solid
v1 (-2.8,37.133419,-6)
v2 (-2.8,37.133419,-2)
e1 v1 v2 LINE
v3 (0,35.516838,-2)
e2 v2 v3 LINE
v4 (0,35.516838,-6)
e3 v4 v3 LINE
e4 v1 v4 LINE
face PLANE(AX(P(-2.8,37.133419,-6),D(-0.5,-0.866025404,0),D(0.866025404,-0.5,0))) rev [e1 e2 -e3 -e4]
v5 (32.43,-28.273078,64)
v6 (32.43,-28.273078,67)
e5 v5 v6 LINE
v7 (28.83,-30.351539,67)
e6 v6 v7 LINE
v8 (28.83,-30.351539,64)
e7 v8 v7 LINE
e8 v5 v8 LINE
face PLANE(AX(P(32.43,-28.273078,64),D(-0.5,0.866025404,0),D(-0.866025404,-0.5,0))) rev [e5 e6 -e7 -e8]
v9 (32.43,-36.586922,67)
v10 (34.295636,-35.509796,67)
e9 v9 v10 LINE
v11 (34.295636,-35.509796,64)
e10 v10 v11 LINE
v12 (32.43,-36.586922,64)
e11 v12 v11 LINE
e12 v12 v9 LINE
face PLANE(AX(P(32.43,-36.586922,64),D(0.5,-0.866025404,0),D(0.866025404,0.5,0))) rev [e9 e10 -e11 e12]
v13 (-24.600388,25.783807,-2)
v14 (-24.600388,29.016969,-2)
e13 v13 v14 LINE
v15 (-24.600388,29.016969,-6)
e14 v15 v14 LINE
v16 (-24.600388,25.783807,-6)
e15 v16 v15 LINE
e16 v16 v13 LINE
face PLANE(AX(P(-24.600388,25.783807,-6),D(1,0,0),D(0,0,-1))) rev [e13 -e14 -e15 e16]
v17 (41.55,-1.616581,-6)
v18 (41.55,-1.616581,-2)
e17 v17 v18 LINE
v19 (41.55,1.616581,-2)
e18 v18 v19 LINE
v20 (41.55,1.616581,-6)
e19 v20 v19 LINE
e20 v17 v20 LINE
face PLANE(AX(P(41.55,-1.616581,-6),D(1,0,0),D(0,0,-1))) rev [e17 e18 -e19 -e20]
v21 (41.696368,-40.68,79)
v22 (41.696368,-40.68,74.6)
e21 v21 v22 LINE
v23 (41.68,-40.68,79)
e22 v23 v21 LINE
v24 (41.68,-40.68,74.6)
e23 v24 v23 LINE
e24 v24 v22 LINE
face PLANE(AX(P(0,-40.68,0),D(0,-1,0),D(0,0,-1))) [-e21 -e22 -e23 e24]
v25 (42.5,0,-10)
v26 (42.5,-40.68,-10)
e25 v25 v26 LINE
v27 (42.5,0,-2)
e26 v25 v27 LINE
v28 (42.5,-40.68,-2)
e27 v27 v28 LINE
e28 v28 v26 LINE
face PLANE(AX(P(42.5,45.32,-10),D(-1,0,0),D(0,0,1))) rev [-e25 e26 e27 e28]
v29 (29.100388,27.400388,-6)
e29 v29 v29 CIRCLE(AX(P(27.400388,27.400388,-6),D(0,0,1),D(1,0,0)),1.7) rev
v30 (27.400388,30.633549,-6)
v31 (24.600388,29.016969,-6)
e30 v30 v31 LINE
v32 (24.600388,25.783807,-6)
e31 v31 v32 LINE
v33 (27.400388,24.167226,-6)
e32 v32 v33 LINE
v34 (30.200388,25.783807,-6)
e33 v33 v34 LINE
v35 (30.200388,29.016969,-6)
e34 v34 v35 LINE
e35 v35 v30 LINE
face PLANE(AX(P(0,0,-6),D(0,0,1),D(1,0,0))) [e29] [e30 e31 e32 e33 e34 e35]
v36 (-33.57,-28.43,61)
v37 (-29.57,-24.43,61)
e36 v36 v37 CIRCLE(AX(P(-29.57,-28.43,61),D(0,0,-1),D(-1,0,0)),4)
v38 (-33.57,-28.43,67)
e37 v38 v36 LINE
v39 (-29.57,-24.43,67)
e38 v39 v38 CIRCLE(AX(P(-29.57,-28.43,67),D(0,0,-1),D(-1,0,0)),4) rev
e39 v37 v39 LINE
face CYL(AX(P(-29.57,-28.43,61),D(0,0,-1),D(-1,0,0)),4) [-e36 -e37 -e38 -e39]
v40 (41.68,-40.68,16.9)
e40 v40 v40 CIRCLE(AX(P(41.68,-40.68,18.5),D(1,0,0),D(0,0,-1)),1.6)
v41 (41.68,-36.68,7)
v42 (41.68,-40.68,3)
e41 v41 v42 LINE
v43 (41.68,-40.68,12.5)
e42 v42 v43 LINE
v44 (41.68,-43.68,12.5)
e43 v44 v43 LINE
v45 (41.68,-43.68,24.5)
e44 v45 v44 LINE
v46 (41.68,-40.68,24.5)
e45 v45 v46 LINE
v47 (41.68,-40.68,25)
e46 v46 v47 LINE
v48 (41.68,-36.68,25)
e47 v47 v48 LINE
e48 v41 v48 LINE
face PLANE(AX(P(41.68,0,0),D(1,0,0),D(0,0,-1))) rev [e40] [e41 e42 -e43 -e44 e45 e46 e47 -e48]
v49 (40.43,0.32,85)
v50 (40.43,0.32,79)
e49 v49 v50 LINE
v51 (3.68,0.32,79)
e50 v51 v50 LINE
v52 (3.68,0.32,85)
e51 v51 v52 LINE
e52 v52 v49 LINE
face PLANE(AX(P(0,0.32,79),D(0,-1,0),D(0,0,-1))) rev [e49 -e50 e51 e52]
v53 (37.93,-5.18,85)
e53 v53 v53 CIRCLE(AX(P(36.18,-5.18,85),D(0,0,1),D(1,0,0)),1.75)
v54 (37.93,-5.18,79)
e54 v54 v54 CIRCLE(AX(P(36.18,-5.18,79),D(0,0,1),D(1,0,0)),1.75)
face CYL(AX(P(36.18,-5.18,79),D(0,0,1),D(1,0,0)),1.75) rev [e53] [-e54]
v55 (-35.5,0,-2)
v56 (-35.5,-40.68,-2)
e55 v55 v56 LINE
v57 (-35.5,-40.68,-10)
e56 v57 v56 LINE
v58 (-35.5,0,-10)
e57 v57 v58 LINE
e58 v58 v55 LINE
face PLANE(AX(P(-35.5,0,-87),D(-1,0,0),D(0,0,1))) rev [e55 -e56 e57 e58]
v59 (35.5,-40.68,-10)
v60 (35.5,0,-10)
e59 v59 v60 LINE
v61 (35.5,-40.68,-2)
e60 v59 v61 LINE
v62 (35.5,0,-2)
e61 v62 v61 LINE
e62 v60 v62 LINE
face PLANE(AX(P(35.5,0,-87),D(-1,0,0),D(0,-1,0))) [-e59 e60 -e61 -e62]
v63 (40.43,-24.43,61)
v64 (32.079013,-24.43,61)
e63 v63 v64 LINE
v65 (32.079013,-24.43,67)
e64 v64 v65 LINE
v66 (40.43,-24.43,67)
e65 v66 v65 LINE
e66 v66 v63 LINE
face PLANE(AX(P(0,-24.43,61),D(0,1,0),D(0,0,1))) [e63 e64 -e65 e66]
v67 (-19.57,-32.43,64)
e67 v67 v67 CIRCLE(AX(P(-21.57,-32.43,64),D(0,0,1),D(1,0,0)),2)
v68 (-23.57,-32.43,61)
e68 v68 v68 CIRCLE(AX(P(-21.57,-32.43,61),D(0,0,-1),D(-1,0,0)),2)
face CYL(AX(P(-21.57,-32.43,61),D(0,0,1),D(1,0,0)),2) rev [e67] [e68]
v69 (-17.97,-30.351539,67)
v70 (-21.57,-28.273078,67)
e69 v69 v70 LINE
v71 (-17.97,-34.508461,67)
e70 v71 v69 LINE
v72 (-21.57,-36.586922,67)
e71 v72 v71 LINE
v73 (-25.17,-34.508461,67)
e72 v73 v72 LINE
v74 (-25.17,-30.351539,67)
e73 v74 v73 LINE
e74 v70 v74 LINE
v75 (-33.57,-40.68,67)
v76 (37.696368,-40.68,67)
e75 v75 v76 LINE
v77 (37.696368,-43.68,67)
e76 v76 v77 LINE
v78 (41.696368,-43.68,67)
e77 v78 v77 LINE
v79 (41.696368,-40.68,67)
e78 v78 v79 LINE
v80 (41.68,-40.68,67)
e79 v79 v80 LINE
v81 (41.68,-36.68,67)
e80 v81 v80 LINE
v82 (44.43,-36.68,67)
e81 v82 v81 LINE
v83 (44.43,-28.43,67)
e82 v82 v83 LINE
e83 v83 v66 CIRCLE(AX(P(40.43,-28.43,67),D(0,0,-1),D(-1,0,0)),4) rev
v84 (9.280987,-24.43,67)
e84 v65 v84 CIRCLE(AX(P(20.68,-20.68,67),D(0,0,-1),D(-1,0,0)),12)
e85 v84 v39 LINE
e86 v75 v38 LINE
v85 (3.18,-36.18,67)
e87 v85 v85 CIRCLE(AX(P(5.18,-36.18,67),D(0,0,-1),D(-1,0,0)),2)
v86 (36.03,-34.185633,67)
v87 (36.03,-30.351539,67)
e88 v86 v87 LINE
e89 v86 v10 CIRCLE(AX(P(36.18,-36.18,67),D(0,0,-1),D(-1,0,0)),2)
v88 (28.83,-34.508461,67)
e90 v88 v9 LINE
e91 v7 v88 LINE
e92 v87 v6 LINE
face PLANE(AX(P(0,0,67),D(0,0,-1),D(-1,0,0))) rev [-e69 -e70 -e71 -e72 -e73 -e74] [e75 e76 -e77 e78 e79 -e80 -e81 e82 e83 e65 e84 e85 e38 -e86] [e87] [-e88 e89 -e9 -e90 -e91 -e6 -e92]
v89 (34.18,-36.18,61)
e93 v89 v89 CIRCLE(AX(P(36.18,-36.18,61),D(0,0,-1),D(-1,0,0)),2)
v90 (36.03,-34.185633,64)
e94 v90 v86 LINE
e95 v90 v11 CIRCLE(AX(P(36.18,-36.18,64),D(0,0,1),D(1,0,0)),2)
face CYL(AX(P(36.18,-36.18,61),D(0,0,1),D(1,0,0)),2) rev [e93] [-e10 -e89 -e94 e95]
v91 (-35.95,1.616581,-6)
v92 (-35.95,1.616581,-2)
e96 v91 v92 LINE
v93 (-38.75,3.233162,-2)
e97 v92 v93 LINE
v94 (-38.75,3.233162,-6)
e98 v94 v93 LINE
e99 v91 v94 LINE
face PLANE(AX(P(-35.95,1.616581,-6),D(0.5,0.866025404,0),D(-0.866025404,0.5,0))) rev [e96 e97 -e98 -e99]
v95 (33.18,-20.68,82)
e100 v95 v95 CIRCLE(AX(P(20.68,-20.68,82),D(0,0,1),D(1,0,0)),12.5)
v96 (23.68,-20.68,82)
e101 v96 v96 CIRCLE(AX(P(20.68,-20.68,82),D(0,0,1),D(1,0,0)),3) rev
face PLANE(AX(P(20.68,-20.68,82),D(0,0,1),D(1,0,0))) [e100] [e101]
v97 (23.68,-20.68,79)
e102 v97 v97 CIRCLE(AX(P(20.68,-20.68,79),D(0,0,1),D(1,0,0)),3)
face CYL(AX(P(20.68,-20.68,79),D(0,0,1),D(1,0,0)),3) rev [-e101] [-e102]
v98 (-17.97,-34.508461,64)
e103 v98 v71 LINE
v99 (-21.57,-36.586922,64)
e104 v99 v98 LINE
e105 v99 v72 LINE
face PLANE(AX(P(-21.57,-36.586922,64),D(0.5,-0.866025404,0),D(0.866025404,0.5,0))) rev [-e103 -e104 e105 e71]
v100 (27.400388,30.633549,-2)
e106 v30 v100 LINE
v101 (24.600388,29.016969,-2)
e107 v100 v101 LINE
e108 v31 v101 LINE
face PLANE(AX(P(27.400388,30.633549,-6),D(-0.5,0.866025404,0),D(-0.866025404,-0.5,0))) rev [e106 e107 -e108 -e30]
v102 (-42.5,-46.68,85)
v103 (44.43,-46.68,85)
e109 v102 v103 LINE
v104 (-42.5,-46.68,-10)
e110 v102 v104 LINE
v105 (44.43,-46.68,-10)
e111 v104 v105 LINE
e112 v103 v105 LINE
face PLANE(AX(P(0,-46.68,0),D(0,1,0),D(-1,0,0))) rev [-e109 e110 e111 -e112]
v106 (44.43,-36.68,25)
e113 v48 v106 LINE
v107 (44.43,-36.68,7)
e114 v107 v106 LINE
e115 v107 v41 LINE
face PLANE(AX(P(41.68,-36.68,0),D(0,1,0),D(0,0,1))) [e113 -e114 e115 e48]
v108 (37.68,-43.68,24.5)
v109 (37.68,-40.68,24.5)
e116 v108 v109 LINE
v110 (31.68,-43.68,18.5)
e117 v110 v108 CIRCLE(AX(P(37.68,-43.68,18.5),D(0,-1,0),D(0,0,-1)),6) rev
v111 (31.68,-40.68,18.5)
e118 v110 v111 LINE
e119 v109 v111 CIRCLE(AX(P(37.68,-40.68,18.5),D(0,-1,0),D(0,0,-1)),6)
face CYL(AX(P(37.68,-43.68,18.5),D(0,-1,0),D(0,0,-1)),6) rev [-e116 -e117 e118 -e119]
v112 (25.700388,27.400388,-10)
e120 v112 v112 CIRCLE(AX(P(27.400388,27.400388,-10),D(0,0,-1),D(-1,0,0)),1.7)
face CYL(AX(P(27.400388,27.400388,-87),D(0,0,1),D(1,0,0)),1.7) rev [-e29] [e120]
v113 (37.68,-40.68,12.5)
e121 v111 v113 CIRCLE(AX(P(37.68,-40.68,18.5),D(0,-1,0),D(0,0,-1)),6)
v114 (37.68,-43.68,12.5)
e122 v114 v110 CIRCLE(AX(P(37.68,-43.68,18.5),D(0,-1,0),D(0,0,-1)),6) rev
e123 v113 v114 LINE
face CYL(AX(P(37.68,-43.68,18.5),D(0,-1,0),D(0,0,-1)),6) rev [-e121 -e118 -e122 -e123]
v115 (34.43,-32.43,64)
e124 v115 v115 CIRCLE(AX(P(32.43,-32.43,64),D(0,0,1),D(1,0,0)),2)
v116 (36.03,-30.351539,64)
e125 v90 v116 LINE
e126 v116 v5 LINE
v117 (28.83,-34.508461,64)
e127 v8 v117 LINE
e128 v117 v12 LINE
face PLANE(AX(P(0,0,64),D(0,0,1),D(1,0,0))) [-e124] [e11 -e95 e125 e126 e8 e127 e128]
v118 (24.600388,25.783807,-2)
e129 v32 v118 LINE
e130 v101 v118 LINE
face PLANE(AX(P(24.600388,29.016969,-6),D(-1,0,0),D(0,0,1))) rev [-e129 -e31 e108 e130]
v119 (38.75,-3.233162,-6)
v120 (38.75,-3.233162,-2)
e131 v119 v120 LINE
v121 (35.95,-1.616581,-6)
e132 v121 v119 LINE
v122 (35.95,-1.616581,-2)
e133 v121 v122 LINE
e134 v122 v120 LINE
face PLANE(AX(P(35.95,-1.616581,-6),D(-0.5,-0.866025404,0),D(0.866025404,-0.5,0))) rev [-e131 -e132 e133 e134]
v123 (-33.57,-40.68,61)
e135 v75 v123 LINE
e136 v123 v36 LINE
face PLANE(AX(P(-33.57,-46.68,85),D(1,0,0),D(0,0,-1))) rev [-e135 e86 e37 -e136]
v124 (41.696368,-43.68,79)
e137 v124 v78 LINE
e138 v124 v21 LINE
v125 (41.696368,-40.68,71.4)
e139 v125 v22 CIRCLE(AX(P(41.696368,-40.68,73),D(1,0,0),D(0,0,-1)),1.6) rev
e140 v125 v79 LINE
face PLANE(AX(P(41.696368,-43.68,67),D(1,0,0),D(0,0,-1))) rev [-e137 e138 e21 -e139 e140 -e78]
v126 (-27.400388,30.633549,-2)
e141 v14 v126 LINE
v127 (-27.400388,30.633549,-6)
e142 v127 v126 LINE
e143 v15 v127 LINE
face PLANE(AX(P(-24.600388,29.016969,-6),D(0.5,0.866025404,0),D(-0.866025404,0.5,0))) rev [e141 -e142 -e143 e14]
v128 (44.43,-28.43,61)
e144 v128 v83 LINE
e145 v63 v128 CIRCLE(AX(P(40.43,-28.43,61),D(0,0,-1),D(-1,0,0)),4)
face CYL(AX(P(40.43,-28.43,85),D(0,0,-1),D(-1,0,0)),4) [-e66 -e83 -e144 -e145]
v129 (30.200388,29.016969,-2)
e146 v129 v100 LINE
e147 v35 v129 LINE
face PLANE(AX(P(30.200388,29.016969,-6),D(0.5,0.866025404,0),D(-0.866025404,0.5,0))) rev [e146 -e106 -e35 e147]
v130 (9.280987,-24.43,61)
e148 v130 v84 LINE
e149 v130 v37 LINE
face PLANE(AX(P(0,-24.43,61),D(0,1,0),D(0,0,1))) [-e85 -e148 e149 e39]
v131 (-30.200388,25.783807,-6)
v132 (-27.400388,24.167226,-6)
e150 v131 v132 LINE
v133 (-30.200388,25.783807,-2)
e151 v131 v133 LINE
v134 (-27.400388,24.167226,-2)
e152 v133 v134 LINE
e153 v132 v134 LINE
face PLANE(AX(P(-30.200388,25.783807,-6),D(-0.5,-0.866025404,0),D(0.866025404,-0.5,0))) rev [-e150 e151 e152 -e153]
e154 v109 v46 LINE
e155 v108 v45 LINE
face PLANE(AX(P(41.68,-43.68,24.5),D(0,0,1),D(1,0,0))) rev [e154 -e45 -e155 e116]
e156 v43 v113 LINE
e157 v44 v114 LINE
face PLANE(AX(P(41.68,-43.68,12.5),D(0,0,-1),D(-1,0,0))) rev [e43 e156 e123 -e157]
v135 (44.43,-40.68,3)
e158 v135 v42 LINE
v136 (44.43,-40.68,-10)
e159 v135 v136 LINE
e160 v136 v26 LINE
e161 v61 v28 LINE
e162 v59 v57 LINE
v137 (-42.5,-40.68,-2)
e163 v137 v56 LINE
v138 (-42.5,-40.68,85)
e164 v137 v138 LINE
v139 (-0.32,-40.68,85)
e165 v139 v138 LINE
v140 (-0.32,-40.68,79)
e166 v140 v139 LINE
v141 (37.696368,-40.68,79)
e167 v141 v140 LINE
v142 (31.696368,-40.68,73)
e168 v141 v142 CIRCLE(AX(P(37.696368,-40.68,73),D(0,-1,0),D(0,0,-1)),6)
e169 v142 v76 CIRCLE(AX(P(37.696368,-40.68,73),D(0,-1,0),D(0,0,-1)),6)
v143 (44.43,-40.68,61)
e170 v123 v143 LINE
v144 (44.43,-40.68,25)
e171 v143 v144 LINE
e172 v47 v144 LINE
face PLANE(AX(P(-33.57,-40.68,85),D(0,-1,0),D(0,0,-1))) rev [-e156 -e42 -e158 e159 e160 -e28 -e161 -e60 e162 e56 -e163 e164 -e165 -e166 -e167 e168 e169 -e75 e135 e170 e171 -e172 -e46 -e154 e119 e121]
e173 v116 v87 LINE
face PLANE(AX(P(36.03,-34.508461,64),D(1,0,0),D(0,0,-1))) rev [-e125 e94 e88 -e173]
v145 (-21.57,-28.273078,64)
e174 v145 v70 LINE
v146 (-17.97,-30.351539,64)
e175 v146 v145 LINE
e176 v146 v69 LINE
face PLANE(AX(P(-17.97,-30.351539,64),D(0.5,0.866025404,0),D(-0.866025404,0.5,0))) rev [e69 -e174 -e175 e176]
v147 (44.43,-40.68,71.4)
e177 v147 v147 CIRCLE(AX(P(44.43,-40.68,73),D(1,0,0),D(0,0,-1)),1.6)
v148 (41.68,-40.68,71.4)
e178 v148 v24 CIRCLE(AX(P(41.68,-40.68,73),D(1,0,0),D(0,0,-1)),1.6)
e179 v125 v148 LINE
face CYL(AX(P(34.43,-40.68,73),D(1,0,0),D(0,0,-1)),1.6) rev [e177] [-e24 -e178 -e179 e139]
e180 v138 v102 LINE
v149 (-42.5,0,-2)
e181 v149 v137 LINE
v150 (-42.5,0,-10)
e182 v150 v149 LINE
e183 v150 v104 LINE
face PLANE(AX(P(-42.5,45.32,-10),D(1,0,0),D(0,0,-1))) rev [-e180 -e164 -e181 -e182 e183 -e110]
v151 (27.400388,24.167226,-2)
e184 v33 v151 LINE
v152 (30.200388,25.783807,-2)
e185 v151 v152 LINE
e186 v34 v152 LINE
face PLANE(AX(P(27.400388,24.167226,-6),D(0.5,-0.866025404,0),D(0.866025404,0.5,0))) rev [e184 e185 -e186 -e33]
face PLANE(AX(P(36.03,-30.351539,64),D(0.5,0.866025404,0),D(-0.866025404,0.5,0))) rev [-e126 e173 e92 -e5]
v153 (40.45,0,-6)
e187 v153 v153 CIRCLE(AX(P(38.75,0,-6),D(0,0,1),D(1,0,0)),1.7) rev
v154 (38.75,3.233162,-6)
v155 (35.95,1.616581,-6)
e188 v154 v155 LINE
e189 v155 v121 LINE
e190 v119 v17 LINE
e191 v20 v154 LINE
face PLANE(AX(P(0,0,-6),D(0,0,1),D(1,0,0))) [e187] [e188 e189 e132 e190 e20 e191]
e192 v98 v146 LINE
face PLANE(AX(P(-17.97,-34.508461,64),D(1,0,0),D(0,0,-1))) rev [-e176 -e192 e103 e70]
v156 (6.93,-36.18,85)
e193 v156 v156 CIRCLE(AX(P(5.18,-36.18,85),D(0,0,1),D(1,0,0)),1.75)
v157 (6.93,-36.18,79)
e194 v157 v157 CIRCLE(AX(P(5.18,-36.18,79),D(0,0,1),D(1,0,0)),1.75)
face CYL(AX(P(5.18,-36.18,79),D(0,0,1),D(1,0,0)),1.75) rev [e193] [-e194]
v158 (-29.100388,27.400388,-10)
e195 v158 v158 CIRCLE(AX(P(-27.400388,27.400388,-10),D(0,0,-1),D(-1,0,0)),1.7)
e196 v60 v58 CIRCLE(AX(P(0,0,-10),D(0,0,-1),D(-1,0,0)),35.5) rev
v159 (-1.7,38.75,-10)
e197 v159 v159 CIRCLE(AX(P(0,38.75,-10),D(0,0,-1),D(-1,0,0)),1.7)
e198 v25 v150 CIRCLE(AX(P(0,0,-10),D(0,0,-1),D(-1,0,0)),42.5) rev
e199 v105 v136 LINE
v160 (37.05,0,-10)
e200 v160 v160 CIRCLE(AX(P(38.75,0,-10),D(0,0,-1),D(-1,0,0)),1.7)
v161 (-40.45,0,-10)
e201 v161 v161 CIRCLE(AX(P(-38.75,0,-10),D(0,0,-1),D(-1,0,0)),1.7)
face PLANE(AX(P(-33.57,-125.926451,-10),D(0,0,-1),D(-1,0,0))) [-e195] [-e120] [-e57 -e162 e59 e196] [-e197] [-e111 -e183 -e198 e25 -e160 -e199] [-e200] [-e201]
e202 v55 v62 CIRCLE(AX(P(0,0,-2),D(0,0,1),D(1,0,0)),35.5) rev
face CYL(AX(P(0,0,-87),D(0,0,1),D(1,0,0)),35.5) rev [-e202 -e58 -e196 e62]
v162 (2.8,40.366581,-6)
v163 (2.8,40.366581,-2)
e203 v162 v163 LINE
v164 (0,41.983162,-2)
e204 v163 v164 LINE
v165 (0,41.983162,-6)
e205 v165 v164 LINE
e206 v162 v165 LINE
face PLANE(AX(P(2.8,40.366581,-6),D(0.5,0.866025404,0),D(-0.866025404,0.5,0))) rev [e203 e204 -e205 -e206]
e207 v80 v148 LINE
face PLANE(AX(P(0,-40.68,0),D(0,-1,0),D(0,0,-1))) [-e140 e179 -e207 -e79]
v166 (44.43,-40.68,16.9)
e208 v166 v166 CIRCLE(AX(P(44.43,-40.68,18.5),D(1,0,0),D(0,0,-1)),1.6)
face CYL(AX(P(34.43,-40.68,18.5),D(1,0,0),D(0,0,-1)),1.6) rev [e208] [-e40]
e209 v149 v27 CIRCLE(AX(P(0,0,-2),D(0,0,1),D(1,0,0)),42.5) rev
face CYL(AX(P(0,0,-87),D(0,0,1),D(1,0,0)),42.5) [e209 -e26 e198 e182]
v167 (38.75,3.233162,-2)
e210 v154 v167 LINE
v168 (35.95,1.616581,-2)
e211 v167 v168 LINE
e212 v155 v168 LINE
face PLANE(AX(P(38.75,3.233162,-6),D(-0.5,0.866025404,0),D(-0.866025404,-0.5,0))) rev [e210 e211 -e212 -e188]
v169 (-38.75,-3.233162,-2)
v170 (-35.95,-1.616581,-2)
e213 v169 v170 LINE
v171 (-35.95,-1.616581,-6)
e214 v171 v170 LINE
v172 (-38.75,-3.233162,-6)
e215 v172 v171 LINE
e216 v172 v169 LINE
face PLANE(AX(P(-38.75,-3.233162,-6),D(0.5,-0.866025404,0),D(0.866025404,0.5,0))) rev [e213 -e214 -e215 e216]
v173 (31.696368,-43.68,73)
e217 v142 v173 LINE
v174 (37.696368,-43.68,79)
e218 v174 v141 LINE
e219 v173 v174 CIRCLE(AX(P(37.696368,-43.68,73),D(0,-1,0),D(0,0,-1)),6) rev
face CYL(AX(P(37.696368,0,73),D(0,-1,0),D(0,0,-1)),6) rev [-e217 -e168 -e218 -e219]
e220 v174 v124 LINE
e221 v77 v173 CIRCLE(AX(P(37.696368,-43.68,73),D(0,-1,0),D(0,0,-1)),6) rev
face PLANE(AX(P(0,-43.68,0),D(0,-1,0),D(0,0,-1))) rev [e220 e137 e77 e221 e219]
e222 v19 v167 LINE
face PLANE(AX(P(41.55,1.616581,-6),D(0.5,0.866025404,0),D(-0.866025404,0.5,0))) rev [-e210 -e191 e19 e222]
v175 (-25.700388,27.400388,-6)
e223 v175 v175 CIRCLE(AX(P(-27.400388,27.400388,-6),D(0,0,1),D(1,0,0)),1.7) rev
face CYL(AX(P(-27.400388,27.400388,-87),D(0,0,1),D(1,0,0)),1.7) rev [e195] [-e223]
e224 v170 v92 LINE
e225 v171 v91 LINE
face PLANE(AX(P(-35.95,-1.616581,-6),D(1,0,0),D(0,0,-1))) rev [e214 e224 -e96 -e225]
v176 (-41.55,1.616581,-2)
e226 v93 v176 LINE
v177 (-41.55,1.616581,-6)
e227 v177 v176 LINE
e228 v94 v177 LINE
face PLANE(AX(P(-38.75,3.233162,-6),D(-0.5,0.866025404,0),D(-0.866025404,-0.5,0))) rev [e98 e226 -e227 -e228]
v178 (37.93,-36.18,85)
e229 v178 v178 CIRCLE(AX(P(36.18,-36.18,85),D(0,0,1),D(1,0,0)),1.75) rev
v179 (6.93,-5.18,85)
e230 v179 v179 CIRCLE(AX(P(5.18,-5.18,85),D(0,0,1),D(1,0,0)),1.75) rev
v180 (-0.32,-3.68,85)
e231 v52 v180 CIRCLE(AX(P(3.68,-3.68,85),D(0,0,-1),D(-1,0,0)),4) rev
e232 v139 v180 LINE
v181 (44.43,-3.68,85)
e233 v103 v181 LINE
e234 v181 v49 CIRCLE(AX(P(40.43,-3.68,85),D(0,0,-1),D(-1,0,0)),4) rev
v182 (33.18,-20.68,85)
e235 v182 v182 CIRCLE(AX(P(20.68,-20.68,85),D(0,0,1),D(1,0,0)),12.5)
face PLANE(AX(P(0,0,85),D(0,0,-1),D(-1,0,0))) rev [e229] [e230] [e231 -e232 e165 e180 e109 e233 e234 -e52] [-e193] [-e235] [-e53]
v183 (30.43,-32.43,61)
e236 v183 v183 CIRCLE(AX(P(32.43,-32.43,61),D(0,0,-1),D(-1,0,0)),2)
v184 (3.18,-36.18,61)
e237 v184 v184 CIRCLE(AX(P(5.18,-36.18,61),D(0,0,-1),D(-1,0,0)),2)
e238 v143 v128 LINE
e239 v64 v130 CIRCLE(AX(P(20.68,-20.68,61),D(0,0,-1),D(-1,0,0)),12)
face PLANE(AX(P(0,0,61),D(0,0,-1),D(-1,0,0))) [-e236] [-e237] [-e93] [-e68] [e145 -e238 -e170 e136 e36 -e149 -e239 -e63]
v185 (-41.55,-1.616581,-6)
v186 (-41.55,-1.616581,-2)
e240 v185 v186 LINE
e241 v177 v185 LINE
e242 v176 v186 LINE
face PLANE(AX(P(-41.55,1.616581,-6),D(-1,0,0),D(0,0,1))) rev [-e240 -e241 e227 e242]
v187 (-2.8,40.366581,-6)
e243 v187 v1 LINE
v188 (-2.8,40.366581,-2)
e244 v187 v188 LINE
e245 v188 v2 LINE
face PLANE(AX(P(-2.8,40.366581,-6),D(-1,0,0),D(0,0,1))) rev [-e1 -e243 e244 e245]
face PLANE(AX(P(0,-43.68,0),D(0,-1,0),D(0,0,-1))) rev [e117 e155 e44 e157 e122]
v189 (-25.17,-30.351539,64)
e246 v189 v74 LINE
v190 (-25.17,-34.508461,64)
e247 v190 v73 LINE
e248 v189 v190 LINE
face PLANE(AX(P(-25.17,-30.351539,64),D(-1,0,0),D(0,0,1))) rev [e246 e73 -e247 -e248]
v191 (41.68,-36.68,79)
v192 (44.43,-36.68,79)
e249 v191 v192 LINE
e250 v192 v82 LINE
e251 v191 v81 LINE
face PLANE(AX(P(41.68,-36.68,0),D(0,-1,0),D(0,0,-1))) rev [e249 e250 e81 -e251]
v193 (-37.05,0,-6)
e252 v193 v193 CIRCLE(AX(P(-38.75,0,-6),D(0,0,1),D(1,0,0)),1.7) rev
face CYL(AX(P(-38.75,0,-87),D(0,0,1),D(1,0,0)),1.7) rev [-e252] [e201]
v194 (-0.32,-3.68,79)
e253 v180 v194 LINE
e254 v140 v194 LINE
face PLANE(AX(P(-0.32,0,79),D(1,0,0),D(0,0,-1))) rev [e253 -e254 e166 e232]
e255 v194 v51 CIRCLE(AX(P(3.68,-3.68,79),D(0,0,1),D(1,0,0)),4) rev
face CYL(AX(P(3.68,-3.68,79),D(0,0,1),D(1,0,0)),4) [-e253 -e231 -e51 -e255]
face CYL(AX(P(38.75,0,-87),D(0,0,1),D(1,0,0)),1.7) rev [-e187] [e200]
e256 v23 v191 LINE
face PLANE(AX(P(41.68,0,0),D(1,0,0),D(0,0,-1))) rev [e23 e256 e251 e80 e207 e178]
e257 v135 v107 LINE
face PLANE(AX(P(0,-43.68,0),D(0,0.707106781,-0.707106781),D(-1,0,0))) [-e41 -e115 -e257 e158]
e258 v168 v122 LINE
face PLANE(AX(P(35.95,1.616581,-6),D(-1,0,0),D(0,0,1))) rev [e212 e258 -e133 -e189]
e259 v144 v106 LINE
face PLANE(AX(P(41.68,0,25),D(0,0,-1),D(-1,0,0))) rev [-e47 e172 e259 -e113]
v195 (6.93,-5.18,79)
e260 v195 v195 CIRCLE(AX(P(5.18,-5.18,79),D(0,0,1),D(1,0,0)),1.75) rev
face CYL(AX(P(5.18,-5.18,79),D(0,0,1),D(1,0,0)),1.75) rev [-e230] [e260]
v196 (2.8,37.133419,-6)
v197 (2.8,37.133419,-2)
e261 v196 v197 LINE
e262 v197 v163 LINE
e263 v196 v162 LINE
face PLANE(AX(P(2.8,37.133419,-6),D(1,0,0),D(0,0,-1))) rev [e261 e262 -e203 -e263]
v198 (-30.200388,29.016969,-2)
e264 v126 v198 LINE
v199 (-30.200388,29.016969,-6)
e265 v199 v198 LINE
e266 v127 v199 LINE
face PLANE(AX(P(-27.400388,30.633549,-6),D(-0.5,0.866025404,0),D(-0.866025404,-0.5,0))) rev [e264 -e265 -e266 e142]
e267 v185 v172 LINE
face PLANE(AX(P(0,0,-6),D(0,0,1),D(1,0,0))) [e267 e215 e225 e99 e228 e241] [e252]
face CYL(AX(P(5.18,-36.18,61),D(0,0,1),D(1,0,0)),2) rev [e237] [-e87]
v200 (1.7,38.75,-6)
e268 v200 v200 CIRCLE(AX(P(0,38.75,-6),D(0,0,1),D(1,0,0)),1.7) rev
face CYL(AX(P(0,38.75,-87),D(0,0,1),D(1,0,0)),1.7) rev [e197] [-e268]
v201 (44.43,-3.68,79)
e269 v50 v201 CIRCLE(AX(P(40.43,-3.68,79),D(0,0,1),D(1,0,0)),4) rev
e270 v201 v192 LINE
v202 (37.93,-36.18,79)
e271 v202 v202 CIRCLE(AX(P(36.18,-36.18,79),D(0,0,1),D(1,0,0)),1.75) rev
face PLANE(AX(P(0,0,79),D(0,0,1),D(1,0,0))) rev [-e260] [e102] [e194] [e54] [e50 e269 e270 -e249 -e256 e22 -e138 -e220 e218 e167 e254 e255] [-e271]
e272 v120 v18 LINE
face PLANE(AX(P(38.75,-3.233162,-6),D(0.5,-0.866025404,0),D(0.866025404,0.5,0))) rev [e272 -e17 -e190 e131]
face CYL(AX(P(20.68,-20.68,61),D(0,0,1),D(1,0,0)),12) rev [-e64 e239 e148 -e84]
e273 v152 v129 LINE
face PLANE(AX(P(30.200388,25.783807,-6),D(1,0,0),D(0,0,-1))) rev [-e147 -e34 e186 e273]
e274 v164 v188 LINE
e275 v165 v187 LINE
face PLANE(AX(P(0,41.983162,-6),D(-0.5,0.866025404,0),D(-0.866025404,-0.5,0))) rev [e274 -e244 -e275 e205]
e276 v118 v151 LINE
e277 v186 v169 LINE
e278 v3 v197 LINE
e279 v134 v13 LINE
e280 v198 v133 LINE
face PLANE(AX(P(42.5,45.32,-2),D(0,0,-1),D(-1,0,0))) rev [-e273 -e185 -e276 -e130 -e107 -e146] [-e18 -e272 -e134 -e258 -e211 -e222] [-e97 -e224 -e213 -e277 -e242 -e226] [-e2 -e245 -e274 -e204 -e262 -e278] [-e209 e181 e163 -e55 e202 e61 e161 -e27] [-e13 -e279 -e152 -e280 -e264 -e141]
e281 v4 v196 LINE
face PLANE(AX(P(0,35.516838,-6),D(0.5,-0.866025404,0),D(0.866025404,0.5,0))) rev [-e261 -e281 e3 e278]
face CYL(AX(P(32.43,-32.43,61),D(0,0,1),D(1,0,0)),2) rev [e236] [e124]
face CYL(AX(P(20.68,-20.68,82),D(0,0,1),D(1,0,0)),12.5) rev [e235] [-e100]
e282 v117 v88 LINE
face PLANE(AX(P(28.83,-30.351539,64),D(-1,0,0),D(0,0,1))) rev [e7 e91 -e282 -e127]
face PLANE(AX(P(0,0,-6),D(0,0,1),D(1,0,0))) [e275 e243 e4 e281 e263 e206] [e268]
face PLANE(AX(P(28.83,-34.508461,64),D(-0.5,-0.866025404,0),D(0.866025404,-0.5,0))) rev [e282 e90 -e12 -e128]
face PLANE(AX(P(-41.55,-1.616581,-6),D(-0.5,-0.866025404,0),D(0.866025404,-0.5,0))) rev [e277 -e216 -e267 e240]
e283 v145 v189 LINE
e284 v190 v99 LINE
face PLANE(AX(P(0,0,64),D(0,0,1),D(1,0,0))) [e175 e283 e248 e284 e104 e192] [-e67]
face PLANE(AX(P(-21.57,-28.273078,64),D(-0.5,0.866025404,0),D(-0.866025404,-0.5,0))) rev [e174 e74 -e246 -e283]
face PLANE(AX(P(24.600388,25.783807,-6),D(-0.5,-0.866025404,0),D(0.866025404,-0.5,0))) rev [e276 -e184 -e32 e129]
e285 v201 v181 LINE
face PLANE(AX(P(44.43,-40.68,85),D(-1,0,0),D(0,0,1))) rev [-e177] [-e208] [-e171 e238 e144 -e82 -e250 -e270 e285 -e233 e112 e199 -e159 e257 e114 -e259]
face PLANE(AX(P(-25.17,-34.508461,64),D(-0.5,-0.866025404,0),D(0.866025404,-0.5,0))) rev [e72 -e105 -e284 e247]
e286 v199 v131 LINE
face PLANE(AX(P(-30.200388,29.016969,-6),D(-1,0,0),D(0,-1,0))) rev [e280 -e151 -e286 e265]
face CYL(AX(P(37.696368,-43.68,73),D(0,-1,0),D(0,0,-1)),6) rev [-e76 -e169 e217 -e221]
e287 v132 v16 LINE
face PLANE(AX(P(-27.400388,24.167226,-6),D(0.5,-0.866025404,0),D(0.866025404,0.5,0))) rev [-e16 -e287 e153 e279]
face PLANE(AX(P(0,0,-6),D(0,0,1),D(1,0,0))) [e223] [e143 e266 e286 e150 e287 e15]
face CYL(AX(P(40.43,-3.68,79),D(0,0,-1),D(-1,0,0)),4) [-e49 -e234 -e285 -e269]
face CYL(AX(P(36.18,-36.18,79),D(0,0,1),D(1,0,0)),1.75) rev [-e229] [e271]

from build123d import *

# Parameters (mm, degrees)
SKETCH1_R            = 18.5
SKETCH1_R_2          = 3.5
SKETCH1_R_3          = 2.25
BOSS_EXTRUDE1_DEPTH  = 6
BOSS_EXTRUDE2_START  = -6
BOSS_EXTRUDE2_DEPTH  = 6
BOSS_EXTRUDE3_DEPTH  = 85
SKETCH6_R            = 2
BOSS_EXTRUDE5_DEPTH  = 6
SKETCH5_W            = 42
SKETCH5_H            = 41
SKETCH5_R            = 1.75
SKETCH5_R_2          = 3
BOSS_EXTRUDE4_DEPTH  = 6
SKETCH8_W            = 25
SKETCH8_H            = 7
BOSS_EXTRUDE7_DEPTH  = 2.75
CHAMFER2_SIZE        = 7
SKETCH9_R            = 1.6
CUT_EXTRUDE2_DEPTH   = 10
SKETCH10_W           = 10
SKETCH10_H           = 12
CUT_EXTRUDE3_DEPTH   = 3
FILLET1_R            = 6
SKETCH13_R           = 2.25
SKETCH13_R_2         = 3.5
CUT_EXTRUDE4_DEPTH   = 10
FILLET2_R            = 4
SKETCH15_W           = 78
SKETCH15_H           = 14
BOSS_EXTRUDE9_DEPTH  = 6
SKETCH17_W           = 85
SKETCH17_H           = 8
BOSS_EXTRUDE10_DEPTH = 86
SKETCH18_W           = 85
SKETCH18_H           = 1
SKETCH18_R           = 35.5
CUT_EXTRUDE8_DEPTH   = 85
BOSS_EXTRUDE11_DEPTH = 6
SKETCH21_R           = 1.7
CUT_EXTRUDE9_DEPTH   = 85
CUT_EXTRUDE10_DEPTH  = 4
CUT_EXTRUDE11_DEPTH  = 3
SKETCH24_R           = 12.5
CUT_EXTRUDE12_DEPTH  = 3


# Some blends are built 0.0001 mm under size
with BuildPart() as part:
    # Sketch1 → Boss-Extrude1 (new body)
    with BuildSketch(Plane.XY):
        Circle(SKETCH1_R)
        Circle(SKETCH1_R_2, mode=Mode.SUBTRACT)
        with Locations((-13.7, 0)):
            Circle(SKETCH1_R_3, mode=Mode.SUBTRACT)
        with Locations((13.7, 0)):
            Circle(SKETCH1_R_3, mode=Mode.SUBTRACT)
    extrude(amount=BOSS_EXTRUDE1_DEPTH)

    # Sketch3 → Boss-Extrude2 (add)
    with BuildSketch(Plane.XY.offset(6).offset(BOSS_EXTRUDE2_START)):
        with BuildLine():
            ThreePointArc((-15.5, -10.099504938), (-17.734147851, -5.267826876), (-18.5, 0))
            Line((-18.5, 0), (-18.5, -46.68))
            Line((-18.5, -46.68), (18.5, -46.68))
            Line((18.5, -46.68), (18.5, 0))
            ThreePointArc((18.5, 0), (17.734147851, -5.267826876), (15.5, -10.099504938))
            Line((15.5, -10.099504938), (15.5, -40.818554828))
            Line((15.5, -40.818554828), (15.5, -43.68))
            Line((15.5, -43.68), (13.738586173, -43.68))
            Line((13.738586173, -43.68), (-13.738586173, -43.68))
            Line((-13.738586173, -43.68), (-15.5, -43.68))
            Line((-15.5, -43.68), (-15.5, -40.818554828))
            Line((-15.5, -40.818554828), (-15.5, -10.099504938))
        make_face()
        with BuildLine():
            Line((-3, -20.512103215), (-15.5, -40.818554828))
            Line((-15.5, -40.818554828), (-15.5, -43.68))
            Line((-15.5, -43.68), (-13.738586173, -43.68))
            Line((-13.738586173, -43.68), (0, -21.361445172))
            Line((0, -21.361445172), (13.738586173, -43.68))
            Line((13.738586173, -43.68), (15.5, -43.68))
            Line((15.5, -43.68), (15.5, -40.818554828))
            Line((15.5, -40.818554828), (3, -20.512103215))
            Line((3, -20.512103215), (1.71251735, -18.420566884))
            ThreePointArc((1.71251735, -18.420566884), (0, -18.5), (-1.71251735, -18.420566884))
            Line((-1.71251735, -18.420566884), (-3, -20.512103215))
        make_face()
        with BuildLine():
            Line((3, -20.512103215), (3, -18.255136264))
            ThreePointArc((3, -18.255136264), (2.357710068, -18.349147207), (1.71251735, -18.420566884))
            Line((1.71251735, -18.420566884), (3, -20.512103215))
        make_face()
        with BuildLine():
            ThreePointArc((-1.71251735, -18.420566884), (-2.357710068, -18.349147207), (-3, -18.255136264))
            Line((-3, -18.255136264), (-3, -20.512103215))
            Line((-3, -20.512103215), (-1.71251735, -18.420566884))
        make_face()
    extrude(amount=BOSS_EXTRUDE2_DEPTH)

    # Sketch4 → Boss-Extrude3 (add)
    with BuildSketch(Plane.XY):
        Polygon((-33.57, -46.68), (-33.57, -40.68), (44.43, -40.68), (44.43, -46.68), (-18.5, -46.68), align=None)
    extrude(amount=BOSS_EXTRUDE3_DEPTH)

    # Sketch6 → Boss-Extrude5 (add)
    with BuildSketch(Plane(origin=(0, 0, 67), x_dir=(-1, 0, 0), z_dir=(0, 0, -1))):
        with BuildLine():
            Line((-44.43, -24.43), (-44.43, -43.68))
            Line((-44.43, -43.68), (33.57, -43.68))
            Line((33.57, -43.68), (33.57, -24.43))
            Line((33.57, -24.43), (-9.280986885, -24.43))
            ThreePointArc((-9.280986885, -24.43), (-20.68, -32.68), (-32.079013115, -24.43))
            Line((-32.079013115, -24.43), (-44.43, -24.43))
        make_face()
        with Locations((-36.18, -36.18)):
            Circle(SKETCH6_R, mode=Mode.SUBTRACT)
        with Locations((-32.43, -32.43)):
            Circle(SKETCH6_R, mode=Mode.SUBTRACT)
        with Locations((-5.18, -36.18)):
            Circle(SKETCH6_R, mode=Mode.SUBTRACT)
        with Locations((21.57, -32.43)):
            Circle(SKETCH6_R, mode=Mode.SUBTRACT)
    extrude(amount=BOSS_EXTRUDE5_DEPTH)

    # Sketch5 → Boss-Extrude4 (add)
    with BuildSketch(Plane.XY.offset(85)):
        with Locations((20.68, -20.18)):
            Rectangle(SKETCH5_W, SKETCH5_H)
        with Locations((5.18, -36.18)):
            Circle(SKETCH5_R, mode=Mode.SUBTRACT)
        with Locations((36.18, -36.18)):
            Circle(SKETCH5_R, mode=Mode.SUBTRACT)
        with Locations((5.18, -5.18)):
            Circle(SKETCH5_R, mode=Mode.SUBTRACT)
        with Locations((20.68, -20.68)):
            Circle(SKETCH5_R_2, mode=Mode.SUBTRACT)
        with Locations((36.18, -5.18)):
            Circle(SKETCH5_R, mode=Mode.SUBTRACT)
    extrude(amount=-BOSS_EXTRUDE4_DEPTH)

    # Sketch8 → Boss-Extrude7 (add)
    with BuildSketch(Plane(origin=(44.43, 0, 0), x_dir=(0, 0, -1), z_dir=(1, 0, 0))):
        with Locations((-12.5, -40.18)):
            Rectangle(SKETCH8_W, SKETCH8_H)
        Polygon((-61, -36.68), (-79, -36.68), (-79, 0.32), (-85, 0.32), (-85, -43.68), (-61, -43.68), align=None)
    extrude(amount=-BOSS_EXTRUDE7_DEPTH)

    # Chamfer2
    # the kernel refuses this chamfer: 7 mm, written as the material it takes off along each edge
    with BuildSketch(Plane(origin=(62.431780916, -36.68, 0), x_dir=(0, 0, 1), z_dir=(-1, 0, 0))) as chamfer2_piece_1:
        Polygon((CHAMFER2_SIZE, 0), (0, -CHAMFER2_SIZE), (0, 0), align=None)
    extrude(amount=38.753561832, mode=Mode.SUBTRACT)
    # the kernel refuses this chamfer: 7 mm, written as the material it takes off along each edge
    with BuildSketch(Plane(origin=(18.5, -40.68, 0), x_dir=(0, -1, 0), z_dir=(1, 0, 0))) as chamfer2_2_piece_1_section:
        Polygon((CHAMFER2_SIZE, 0), (0, -CHAMFER2_SIZE), (0, 0), align=None)
    chamfer2_2_piece_1 = extrude(amount=23.18, mode=Mode.PRIVATE)
    chamfer2_2_piece_1 = split(chamfer2_2_piece_1, bisect_by=Plane(origin=(18.5, -42.18, 1.5), z_dir=(0, 0.7071067811865476, -0.7071067811865476)), keep=Keep.TOP, mode=Mode.PRIVATE)
    add(chamfer2_2_piece_1, mode=Mode.SUBTRACT)

    # Sketch9 → Cut-Extrude2 (cut)
    with BuildSketch(Plane(origin=(44.43, 0, 0), x_dir=(0, 0, -1), z_dir=(1, 0, 0))):
        with Locations((-73, -40.68)):
            Circle(SKETCH9_R)
        with Locations((-18.5, -40.68)):
            Circle(SKETCH9_R)
    extrude(amount=-CUT_EXTRUDE2_DEPTH, mode=Mode.SUBTRACT)

    # Sketch10 → Cut-Extrude3 (cut)
    with BuildSketch(Plane(origin=(0, -40.68, 0), x_dir=(1, 0, 0), z_dir=(0, 1, 0))):
        with Locations((36.68, -18.5)):
            Rectangle(SKETCH10_W, SKETCH10_H)
        with Locations((36.696367594, -73)):
            Rectangle(SKETCH10_W, SKETCH10_H)
    extrude(amount=-CUT_EXTRUDE3_DEPTH, mode=Mode.SUBTRACT)

    # Fillet1
    fillet1_edges = [part.edges().sort_by_distance(p)[0] for p in [
        (31.696367594, -42.18, 67),
        (31.696367594, -42.18, 79),
        (31.68, -42.18, 24.5),
        (31.68, -42.18, 12.5),
    ]]
    fillet(fillet1_edges, radius=FILLET1_R - 0.0001)  # a hair under: the kernel refuses the full size

    # Sketch13 → Cut-Extrude4 (cut)
    # profile 1 of 4: a face of its own
    with BuildSketch(Plane(origin=(0, 0, 0), x_dir=(-1, 0, 0), z_dir=(0, 0, -1))):
        with BuildLine():
            ThreePointArc((3, -18.255136264), (0, -18.5), (-3, -18.255136264))
            Line((-3, -18.255136264), (-3, -20.512103215))
            Line((-3, -20.512103215), (-15.414710094, -40.68))
            Line((-15.414710094, -40.68), (-11.89188244, -40.68))
            Line((-11.89188244, -40.68), (0, -21.361445172))
            Line((0, -21.361445172), (11.89188244, -40.68))
            Line((11.89188244, -40.68), (15.414710094, -40.68))
            Line((15.414710094, -40.68), (3, -20.512103215))
            Line((3, -20.512103215), (3, -18.255136264))
        make_face()
    # profile 2 of 4: a face of its own
    with BuildSketch(Plane(origin=(0, 0, 0), x_dir=(-1, 0, 0), z_dir=(0, 0, -1))):
        with BuildLine():
            ThreePointArc((-15.5, -10.099504938), (-17.734147851, -5.267826876), (-18.5, 0))
            Line((-18.5, 0), (-18.5, -40.68))
            Line((-18.5, -40.68), (-15.5, -40.68))
            Line((-15.5, -40.68), (-15.5, -10.099504938))
        make_face()
    # profile 3 of 4: a face of its own
    with BuildSketch(Plane(origin=(0, 0, 0), x_dir=(-1, 0, 0), z_dir=(0, 0, -1))):
        with BuildLine():
            Line((18.5, -40.68), (18.5, 0))
            ThreePointArc((18.5, 0), (17.734147851, -5.267826876), (15.5, -10.099504938))
            Line((15.5, -10.099504938), (15.5, -40.68))
            Line((15.5, -40.68), (18.5, -40.68))
        make_face()
    # profile 4 of 4: a face of its own
    with BuildSketch(Plane(origin=(0, 0, 0), x_dir=(-1, 0, 0), z_dir=(0, 0, -1))):
        with BuildLine():
            ThreePointArc((18.5, 0), (0, 18.5), (-18.5, 0))
            ThreePointArc((-18.5, 0), (-17.734147851, -5.267826876), (-15.5, -10.099504938))
            ThreePointArc((-15.5, -10.099504938), (-10.10896041, -15.493834884), (-3, -18.255136264))
            ThreePointArc((-3, -18.255136264), (0, -18.5), (3, -18.255136264))
            ThreePointArc((3, -18.255136264), (10.10896041, -15.493834884), (15.5, -10.099504938))
            ThreePointArc((15.5, -10.099504938), (17.734147851, -5.267826876), (18.5, 0))
        make_face()
        with Locations((-13.7, 0)):
            Circle(SKETCH13_R, mode=Mode.SUBTRACT)
        Circle(SKETCH13_R_2, mode=Mode.SUBTRACT)
        with Locations((13.7, 0)):
            Circle(SKETCH13_R, mode=Mode.SUBTRACT)
    extrude(amount=-CUT_EXTRUDE4_DEPTH, mode=Mode.SUBTRACT)

    # Fillet2
    fillet2_edges = [part.edges().sort_by_distance(p)[0] for p in [
        (44.43, -24.43, 64),
        (-33.57, -24.43, 64),
        (-0.32, 0.32, 82),
        (44.43, 0.32, 82),
        (-33.57, -43.68, 0),
        (-33.57, -43.68, 85),
    ]]
    fillet(fillet2_edges, radius=FILLET2_R)

    # Sketch15 → Boss-Extrude9 (add)
    with BuildSketch(Plane(origin=(0, -40.68, 0), x_dir=(1, 0, 0), z_dir=(0, 1, 0))):
        with Locations((5.43, 3)):
            Rectangle(SKETCH15_W, SKETCH15_H)
    extrude(amount=-BOSS_EXTRUDE9_DEPTH)

    # Sketch17 → Boss-Extrude10 (add)
    with BuildSketch(Plane(origin=(0, -40.68, 0), x_dir=(1, 0, 0), z_dir=(0, 1, 0))):
        with Locations((0, 6)):
            Rectangle(SKETCH17_W, SKETCH17_H)
    extrude(amount=BOSS_EXTRUDE10_DEPTH)

    # Sketch18 → Cut-Extrude8 (cut)
    with BuildSketch(Plane(origin=(0, 0, -2), x_dir=(-1, 0, 0), z_dir=(0, 0, -1))):
        with BuildLine():
            ThreePointArc((-42.5, -1.19e-07), (-5.9e-08, 42.5), (42.5, 0))
            Line((42.5, 0), (42.5, 2.32))
            Line((42.5, 2.32), (42.5, 44.32))
            Line((42.5, 44.32), (-42.5, 44.32))
            Line((-42.5, 44.32), (-42.5, -1.19e-07))
        make_face()
        with Locations((0, 44.82)):
            Rectangle(SKETCH18_W, SKETCH18_H)
        Circle(SKETCH18_R)
        with BuildLine():
            Line((35.5, -23.366642891), (35.5, 0))
            ThreePointArc((35.5, 0), (0, -35.5), (-35.5, 0))
            Line((-35.5, 0), (-35.5, -23.366642891))
            ThreePointArc((-35.5, -23.366642891), (-25.421307893, -34.058877037), (-12.30396684, -40.68))
            Line((-12.30396684, -40.68), (12.30396684, -40.68))
            ThreePointArc((12.30396684, -40.68), (25.421307893, -34.058877037), (35.5, -23.366642891))
        make_face()
        with BuildLine():
            Line((35.5, -40.68), (35.5, -23.366642891))
            ThreePointArc((35.5, -23.366642891), (25.421307893, -34.058877037), (12.30396684, -40.68))
            Line((12.30396684, -40.68), (33.57, -40.68))
            Line((33.57, -40.68), (35.5, -40.68))
        make_face()
        with BuildLine():
            ThreePointArc((-12.30396684, -40.68), (-25.421307893, -34.058877037), (-35.5, -23.366642891))
            Line((-35.5, -23.366642891), (-35.5, -40.68))
            Line((-35.5, -40.68), (-12.30396684, -40.68))
        make_face()
    extrude(amount=CUT_EXTRUDE8_DEPTH, mode=Mode.SUBTRACT)

    # Sketch19 → Boss-Extrude11 (add)
    with BuildSketch(Plane.XZ.offset(46.68)):
        Polygon((-33.57, -10), (-42.5, -10), (-42.5, 85), (-18.104719374, 85), align=None)
    extrude(amount=-BOSS_EXTRUDE11_DEPTH)

    # Sketch21 → Cut-Extrude9 (cut)
    with BuildSketch(Plane.XY.offset(-2)):
        with Locations((-38.75, 0)):
            Circle(SKETCH21_R)
        with Locations((-27.400387771, 27.400387771)):
            Circle(SKETCH21_R)
        with Locations((0, 38.75)):
            Circle(SKETCH21_R)
        with Locations((27.400387771, 27.400387771)):
            Circle(SKETCH21_R)
        with Locations((38.75, 0)):
            Circle(SKETCH21_R)
    extrude(amount=-CUT_EXTRUDE9_DEPTH, mode=Mode.SUBTRACT)

    # Sketch22 → Cut-Extrude10 (cut)
    with BuildSketch(Plane.XY.offset(-2)):
        Polygon((38.75, 3.233161507), (35.95, 1.616580754), (35.95, -1.616580754), (38.75, -3.233161507), (41.55, -1.616580754), (41.55, 1.616580754), align=None)
        Polygon((27.400387771, 30.633549278), (24.600387771, 29.016968525), (24.600387771, 25.783807017), (27.400387771, 24.167226264), (30.200387771, 25.783807017), (30.200387771, 29.016968525), align=None)
        Polygon((0, 41.983161507), (-2.8, 40.366580754), (-2.8, 37.133419246), (0, 35.516838493), (2.8, 37.133419246), (2.8, 40.366580754), align=None)
        Polygon((-27.400387771, 30.633549278), (-30.200387771, 29.016968525), (-30.200387771, 25.783807017), (-27.400387771, 24.167226264), (-24.600387771, 25.783807017), (-24.600387771, 29.016968525), align=None)
        Polygon((-38.75, 3.233161507), (-41.55, 1.616580754), (-41.55, -1.616580754), (-38.75, -3.233161507), (-35.95, -1.616580754), (-35.95, 1.616580754), align=None)
    extrude(amount=-CUT_EXTRUDE10_DEPTH, mode=Mode.SUBTRACT)

    # Sketch23 → Cut-Extrude11 (cut)
    with BuildSketch(Plane.XY.offset(67)):
        Polygon((-21.57, -28.273078062), (-25.17, -30.351539031), (-25.17, -34.508460969), (-21.57, -36.586921938), (-17.97, -34.508460969), (-17.97, -30.351539031), align=None)
        Polygon((32.43, -28.273078062), (28.83, -30.351539031), (28.83, -34.508460969), (32.43, -36.586921938), (36.03, -34.508460969), (36.03, -30.351539031), align=None)
    extrude(amount=-CUT_EXTRUDE11_DEPTH, mode=Mode.SUBTRACT)

    # Sketch24 → Cut-Extrude12 (cut)
    with BuildSketch(Plane.XY.offset(85)):
        with Locations((20.68, -20.68)):
            Circle(SKETCH24_R)
    extrude(amount=-CUT_EXTRUDE12_DEPTH, mode=Mode.SUBTRACT)


solid = part.part
